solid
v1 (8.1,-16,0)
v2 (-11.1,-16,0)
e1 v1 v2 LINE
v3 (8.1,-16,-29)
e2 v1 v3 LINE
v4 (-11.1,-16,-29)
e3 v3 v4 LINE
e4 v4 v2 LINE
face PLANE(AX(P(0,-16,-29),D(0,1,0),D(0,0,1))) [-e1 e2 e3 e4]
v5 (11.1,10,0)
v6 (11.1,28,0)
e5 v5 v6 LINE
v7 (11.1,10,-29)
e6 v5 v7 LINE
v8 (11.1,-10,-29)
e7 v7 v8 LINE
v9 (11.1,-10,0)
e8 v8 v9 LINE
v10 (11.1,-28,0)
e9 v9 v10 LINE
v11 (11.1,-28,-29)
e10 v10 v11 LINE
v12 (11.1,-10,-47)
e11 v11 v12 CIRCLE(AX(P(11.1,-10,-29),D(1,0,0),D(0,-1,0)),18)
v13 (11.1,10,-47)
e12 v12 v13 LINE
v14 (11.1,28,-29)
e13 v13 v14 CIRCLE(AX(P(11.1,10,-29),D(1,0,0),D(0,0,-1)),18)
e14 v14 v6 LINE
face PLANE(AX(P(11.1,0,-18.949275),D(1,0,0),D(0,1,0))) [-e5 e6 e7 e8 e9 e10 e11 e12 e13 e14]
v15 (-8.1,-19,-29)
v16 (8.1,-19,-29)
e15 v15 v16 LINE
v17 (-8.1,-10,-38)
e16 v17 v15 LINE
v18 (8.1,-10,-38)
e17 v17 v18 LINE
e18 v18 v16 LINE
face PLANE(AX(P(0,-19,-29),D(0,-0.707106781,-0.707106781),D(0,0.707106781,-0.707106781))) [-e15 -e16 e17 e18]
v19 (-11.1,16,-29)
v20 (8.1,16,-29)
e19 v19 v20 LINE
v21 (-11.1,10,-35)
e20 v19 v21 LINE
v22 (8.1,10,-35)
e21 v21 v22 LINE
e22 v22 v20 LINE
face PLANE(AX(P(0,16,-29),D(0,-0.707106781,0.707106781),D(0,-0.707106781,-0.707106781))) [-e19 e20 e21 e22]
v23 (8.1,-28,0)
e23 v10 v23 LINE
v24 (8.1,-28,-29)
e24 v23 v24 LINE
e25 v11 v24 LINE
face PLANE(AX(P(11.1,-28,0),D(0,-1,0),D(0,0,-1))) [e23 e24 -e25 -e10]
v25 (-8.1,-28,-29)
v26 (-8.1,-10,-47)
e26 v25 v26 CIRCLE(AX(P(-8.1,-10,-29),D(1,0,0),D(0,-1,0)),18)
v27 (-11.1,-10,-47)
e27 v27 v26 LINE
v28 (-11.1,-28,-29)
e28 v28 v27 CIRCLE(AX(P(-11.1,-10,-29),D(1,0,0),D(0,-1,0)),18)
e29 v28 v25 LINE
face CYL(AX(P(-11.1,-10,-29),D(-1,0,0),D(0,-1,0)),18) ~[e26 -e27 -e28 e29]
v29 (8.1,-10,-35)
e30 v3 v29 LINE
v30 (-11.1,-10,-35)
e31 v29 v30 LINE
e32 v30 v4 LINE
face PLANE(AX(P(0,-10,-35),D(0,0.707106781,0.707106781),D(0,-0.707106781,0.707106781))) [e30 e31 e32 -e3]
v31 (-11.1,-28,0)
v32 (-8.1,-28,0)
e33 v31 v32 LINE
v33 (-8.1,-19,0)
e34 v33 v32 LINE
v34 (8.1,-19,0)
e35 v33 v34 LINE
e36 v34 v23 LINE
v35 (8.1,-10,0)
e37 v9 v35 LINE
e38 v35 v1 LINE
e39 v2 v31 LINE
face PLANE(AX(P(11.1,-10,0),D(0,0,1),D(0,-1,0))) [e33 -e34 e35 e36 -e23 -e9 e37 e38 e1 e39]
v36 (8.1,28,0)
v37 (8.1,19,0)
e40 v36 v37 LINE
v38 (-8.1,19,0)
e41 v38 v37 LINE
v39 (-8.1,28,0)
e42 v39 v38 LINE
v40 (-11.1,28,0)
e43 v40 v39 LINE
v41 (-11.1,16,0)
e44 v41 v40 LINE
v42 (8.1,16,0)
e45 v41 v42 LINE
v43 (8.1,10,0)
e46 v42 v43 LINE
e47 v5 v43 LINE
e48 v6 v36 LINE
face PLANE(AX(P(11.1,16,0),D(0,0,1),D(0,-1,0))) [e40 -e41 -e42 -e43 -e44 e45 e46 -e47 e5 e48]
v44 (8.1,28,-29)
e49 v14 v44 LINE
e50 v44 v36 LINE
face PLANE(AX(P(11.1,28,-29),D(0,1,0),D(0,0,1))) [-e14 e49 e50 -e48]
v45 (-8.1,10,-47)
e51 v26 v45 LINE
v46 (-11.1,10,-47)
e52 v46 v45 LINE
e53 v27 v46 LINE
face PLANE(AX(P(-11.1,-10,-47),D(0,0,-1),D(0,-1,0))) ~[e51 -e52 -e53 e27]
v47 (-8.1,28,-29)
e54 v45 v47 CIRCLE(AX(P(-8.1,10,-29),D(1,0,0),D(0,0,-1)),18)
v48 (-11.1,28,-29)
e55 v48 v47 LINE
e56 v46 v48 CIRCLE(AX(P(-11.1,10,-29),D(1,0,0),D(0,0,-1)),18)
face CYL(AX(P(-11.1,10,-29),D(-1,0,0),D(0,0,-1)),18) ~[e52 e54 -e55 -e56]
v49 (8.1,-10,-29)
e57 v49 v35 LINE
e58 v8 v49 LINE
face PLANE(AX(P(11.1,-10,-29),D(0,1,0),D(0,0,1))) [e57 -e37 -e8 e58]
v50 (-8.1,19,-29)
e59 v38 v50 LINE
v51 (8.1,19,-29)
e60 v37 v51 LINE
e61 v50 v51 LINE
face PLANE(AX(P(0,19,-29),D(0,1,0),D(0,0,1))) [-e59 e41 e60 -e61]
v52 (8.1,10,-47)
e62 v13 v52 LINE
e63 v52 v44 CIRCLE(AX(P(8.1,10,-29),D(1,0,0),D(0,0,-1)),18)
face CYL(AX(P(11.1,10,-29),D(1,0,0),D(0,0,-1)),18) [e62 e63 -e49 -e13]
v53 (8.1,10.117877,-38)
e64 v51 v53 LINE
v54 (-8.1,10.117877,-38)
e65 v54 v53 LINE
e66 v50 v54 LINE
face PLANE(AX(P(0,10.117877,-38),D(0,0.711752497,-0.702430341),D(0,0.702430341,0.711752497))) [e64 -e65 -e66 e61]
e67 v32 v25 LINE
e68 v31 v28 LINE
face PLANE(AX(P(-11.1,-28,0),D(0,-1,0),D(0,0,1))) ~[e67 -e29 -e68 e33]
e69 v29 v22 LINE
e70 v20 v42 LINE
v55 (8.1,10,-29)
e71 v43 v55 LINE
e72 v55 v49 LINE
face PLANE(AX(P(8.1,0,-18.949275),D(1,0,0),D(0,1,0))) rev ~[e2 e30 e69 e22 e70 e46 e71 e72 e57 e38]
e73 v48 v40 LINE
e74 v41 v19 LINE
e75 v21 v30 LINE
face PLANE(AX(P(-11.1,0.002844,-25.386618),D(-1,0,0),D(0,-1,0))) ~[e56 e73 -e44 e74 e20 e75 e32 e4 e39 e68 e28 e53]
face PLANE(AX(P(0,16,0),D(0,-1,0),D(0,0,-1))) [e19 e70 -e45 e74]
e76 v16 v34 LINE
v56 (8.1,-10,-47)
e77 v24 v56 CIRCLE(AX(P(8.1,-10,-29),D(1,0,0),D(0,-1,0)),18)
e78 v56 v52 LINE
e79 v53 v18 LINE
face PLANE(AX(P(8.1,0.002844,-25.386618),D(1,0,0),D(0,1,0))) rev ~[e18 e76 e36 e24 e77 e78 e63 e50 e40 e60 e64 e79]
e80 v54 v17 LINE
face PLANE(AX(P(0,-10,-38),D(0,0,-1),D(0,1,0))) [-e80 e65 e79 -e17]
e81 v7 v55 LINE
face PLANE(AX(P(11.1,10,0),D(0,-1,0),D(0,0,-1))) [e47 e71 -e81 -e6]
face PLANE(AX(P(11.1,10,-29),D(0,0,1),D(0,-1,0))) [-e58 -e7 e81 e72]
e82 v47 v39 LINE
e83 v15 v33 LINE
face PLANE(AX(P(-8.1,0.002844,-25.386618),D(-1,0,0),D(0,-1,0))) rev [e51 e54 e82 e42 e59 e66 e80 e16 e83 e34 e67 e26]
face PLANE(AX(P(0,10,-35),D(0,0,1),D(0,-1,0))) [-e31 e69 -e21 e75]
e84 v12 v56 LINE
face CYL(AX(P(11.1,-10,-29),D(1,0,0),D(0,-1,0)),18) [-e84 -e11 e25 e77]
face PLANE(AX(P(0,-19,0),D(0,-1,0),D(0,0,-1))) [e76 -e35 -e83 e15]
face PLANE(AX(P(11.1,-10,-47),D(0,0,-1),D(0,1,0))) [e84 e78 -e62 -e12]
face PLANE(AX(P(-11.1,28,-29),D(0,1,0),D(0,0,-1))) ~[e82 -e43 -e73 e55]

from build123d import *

# Parameters (mm, degrees)
F2_DEPTH = 11.1
F4_DEPTH = 3
F6_DEPTH = 3


# Not quite as in the source:
# - a pattern or mirror of a feature is missing from the dataset's text; its kind, count and spacing are read off the source's solid


with BuildPart() as f2:
    # F1 (on Right) → F2 (new body, symmetric)
    with BuildSketch(Plane.YZ):
        Polygon((-16, 0), (-19, 0), (-19, -29), (-10, -38), (-6, -38), (6, -38), (10.1178772148, -38), (19, -29), (19, 0), (16, 0), (16, -29), (10, -35), (0, -35), (-10, -35), (-16, -29), align=None)
    extrude(amount=F2_DEPTH, both=True)

    # F3 (on face) → F4 (join)
    with BuildSketch(Plane.YZ.offset(11.1)):
        with BuildLine():
            Line((-28, 0), (-28, -29))
            ThreePointArc((-28, -29), (-22.7279220614, -41.7279220614), (-10, -47))
            Line((-10, -47), (10, -47))
            ThreePointArc((10, -47), (22.7279220614, -41.7279220614), (28, -29))
            Line((28, -29), (28, 0))
            Line((28, 0), (19, 0))
            Line((19, 0), (19, -29))
            Line((19, -29), (10.1178772148, -38))
            Line((10.1178772148, -38), (-10, -38))
            Line((-10, -38), (-19, -29))
            Line((-19, -29), (-19, 0))
            Line((-19, 0), (-28, 0))
        make_face()
    f4 = extrude(amount=-F4_DEPTH)

    # F4_copies: F4 across plane
    add(f4.mirror(Plane(origin=(0, 0, 0), x_dir=(0, 0, -1), z_dir=(-1, 0, 0))))

    # F5 (on face) → F6 (join)
    with BuildSketch(Plane.YZ.offset(11.1)):
        Polygon((10, 0), (10, -29), (-10, -29), (-10, 0), (-16, 0), (-16, -29), (-10, -35), (0, -35), (10, -35), (16, -29), (16, 0), align=None)
    extrude(amount=-F6_DEPTH)


solid = f2.part
